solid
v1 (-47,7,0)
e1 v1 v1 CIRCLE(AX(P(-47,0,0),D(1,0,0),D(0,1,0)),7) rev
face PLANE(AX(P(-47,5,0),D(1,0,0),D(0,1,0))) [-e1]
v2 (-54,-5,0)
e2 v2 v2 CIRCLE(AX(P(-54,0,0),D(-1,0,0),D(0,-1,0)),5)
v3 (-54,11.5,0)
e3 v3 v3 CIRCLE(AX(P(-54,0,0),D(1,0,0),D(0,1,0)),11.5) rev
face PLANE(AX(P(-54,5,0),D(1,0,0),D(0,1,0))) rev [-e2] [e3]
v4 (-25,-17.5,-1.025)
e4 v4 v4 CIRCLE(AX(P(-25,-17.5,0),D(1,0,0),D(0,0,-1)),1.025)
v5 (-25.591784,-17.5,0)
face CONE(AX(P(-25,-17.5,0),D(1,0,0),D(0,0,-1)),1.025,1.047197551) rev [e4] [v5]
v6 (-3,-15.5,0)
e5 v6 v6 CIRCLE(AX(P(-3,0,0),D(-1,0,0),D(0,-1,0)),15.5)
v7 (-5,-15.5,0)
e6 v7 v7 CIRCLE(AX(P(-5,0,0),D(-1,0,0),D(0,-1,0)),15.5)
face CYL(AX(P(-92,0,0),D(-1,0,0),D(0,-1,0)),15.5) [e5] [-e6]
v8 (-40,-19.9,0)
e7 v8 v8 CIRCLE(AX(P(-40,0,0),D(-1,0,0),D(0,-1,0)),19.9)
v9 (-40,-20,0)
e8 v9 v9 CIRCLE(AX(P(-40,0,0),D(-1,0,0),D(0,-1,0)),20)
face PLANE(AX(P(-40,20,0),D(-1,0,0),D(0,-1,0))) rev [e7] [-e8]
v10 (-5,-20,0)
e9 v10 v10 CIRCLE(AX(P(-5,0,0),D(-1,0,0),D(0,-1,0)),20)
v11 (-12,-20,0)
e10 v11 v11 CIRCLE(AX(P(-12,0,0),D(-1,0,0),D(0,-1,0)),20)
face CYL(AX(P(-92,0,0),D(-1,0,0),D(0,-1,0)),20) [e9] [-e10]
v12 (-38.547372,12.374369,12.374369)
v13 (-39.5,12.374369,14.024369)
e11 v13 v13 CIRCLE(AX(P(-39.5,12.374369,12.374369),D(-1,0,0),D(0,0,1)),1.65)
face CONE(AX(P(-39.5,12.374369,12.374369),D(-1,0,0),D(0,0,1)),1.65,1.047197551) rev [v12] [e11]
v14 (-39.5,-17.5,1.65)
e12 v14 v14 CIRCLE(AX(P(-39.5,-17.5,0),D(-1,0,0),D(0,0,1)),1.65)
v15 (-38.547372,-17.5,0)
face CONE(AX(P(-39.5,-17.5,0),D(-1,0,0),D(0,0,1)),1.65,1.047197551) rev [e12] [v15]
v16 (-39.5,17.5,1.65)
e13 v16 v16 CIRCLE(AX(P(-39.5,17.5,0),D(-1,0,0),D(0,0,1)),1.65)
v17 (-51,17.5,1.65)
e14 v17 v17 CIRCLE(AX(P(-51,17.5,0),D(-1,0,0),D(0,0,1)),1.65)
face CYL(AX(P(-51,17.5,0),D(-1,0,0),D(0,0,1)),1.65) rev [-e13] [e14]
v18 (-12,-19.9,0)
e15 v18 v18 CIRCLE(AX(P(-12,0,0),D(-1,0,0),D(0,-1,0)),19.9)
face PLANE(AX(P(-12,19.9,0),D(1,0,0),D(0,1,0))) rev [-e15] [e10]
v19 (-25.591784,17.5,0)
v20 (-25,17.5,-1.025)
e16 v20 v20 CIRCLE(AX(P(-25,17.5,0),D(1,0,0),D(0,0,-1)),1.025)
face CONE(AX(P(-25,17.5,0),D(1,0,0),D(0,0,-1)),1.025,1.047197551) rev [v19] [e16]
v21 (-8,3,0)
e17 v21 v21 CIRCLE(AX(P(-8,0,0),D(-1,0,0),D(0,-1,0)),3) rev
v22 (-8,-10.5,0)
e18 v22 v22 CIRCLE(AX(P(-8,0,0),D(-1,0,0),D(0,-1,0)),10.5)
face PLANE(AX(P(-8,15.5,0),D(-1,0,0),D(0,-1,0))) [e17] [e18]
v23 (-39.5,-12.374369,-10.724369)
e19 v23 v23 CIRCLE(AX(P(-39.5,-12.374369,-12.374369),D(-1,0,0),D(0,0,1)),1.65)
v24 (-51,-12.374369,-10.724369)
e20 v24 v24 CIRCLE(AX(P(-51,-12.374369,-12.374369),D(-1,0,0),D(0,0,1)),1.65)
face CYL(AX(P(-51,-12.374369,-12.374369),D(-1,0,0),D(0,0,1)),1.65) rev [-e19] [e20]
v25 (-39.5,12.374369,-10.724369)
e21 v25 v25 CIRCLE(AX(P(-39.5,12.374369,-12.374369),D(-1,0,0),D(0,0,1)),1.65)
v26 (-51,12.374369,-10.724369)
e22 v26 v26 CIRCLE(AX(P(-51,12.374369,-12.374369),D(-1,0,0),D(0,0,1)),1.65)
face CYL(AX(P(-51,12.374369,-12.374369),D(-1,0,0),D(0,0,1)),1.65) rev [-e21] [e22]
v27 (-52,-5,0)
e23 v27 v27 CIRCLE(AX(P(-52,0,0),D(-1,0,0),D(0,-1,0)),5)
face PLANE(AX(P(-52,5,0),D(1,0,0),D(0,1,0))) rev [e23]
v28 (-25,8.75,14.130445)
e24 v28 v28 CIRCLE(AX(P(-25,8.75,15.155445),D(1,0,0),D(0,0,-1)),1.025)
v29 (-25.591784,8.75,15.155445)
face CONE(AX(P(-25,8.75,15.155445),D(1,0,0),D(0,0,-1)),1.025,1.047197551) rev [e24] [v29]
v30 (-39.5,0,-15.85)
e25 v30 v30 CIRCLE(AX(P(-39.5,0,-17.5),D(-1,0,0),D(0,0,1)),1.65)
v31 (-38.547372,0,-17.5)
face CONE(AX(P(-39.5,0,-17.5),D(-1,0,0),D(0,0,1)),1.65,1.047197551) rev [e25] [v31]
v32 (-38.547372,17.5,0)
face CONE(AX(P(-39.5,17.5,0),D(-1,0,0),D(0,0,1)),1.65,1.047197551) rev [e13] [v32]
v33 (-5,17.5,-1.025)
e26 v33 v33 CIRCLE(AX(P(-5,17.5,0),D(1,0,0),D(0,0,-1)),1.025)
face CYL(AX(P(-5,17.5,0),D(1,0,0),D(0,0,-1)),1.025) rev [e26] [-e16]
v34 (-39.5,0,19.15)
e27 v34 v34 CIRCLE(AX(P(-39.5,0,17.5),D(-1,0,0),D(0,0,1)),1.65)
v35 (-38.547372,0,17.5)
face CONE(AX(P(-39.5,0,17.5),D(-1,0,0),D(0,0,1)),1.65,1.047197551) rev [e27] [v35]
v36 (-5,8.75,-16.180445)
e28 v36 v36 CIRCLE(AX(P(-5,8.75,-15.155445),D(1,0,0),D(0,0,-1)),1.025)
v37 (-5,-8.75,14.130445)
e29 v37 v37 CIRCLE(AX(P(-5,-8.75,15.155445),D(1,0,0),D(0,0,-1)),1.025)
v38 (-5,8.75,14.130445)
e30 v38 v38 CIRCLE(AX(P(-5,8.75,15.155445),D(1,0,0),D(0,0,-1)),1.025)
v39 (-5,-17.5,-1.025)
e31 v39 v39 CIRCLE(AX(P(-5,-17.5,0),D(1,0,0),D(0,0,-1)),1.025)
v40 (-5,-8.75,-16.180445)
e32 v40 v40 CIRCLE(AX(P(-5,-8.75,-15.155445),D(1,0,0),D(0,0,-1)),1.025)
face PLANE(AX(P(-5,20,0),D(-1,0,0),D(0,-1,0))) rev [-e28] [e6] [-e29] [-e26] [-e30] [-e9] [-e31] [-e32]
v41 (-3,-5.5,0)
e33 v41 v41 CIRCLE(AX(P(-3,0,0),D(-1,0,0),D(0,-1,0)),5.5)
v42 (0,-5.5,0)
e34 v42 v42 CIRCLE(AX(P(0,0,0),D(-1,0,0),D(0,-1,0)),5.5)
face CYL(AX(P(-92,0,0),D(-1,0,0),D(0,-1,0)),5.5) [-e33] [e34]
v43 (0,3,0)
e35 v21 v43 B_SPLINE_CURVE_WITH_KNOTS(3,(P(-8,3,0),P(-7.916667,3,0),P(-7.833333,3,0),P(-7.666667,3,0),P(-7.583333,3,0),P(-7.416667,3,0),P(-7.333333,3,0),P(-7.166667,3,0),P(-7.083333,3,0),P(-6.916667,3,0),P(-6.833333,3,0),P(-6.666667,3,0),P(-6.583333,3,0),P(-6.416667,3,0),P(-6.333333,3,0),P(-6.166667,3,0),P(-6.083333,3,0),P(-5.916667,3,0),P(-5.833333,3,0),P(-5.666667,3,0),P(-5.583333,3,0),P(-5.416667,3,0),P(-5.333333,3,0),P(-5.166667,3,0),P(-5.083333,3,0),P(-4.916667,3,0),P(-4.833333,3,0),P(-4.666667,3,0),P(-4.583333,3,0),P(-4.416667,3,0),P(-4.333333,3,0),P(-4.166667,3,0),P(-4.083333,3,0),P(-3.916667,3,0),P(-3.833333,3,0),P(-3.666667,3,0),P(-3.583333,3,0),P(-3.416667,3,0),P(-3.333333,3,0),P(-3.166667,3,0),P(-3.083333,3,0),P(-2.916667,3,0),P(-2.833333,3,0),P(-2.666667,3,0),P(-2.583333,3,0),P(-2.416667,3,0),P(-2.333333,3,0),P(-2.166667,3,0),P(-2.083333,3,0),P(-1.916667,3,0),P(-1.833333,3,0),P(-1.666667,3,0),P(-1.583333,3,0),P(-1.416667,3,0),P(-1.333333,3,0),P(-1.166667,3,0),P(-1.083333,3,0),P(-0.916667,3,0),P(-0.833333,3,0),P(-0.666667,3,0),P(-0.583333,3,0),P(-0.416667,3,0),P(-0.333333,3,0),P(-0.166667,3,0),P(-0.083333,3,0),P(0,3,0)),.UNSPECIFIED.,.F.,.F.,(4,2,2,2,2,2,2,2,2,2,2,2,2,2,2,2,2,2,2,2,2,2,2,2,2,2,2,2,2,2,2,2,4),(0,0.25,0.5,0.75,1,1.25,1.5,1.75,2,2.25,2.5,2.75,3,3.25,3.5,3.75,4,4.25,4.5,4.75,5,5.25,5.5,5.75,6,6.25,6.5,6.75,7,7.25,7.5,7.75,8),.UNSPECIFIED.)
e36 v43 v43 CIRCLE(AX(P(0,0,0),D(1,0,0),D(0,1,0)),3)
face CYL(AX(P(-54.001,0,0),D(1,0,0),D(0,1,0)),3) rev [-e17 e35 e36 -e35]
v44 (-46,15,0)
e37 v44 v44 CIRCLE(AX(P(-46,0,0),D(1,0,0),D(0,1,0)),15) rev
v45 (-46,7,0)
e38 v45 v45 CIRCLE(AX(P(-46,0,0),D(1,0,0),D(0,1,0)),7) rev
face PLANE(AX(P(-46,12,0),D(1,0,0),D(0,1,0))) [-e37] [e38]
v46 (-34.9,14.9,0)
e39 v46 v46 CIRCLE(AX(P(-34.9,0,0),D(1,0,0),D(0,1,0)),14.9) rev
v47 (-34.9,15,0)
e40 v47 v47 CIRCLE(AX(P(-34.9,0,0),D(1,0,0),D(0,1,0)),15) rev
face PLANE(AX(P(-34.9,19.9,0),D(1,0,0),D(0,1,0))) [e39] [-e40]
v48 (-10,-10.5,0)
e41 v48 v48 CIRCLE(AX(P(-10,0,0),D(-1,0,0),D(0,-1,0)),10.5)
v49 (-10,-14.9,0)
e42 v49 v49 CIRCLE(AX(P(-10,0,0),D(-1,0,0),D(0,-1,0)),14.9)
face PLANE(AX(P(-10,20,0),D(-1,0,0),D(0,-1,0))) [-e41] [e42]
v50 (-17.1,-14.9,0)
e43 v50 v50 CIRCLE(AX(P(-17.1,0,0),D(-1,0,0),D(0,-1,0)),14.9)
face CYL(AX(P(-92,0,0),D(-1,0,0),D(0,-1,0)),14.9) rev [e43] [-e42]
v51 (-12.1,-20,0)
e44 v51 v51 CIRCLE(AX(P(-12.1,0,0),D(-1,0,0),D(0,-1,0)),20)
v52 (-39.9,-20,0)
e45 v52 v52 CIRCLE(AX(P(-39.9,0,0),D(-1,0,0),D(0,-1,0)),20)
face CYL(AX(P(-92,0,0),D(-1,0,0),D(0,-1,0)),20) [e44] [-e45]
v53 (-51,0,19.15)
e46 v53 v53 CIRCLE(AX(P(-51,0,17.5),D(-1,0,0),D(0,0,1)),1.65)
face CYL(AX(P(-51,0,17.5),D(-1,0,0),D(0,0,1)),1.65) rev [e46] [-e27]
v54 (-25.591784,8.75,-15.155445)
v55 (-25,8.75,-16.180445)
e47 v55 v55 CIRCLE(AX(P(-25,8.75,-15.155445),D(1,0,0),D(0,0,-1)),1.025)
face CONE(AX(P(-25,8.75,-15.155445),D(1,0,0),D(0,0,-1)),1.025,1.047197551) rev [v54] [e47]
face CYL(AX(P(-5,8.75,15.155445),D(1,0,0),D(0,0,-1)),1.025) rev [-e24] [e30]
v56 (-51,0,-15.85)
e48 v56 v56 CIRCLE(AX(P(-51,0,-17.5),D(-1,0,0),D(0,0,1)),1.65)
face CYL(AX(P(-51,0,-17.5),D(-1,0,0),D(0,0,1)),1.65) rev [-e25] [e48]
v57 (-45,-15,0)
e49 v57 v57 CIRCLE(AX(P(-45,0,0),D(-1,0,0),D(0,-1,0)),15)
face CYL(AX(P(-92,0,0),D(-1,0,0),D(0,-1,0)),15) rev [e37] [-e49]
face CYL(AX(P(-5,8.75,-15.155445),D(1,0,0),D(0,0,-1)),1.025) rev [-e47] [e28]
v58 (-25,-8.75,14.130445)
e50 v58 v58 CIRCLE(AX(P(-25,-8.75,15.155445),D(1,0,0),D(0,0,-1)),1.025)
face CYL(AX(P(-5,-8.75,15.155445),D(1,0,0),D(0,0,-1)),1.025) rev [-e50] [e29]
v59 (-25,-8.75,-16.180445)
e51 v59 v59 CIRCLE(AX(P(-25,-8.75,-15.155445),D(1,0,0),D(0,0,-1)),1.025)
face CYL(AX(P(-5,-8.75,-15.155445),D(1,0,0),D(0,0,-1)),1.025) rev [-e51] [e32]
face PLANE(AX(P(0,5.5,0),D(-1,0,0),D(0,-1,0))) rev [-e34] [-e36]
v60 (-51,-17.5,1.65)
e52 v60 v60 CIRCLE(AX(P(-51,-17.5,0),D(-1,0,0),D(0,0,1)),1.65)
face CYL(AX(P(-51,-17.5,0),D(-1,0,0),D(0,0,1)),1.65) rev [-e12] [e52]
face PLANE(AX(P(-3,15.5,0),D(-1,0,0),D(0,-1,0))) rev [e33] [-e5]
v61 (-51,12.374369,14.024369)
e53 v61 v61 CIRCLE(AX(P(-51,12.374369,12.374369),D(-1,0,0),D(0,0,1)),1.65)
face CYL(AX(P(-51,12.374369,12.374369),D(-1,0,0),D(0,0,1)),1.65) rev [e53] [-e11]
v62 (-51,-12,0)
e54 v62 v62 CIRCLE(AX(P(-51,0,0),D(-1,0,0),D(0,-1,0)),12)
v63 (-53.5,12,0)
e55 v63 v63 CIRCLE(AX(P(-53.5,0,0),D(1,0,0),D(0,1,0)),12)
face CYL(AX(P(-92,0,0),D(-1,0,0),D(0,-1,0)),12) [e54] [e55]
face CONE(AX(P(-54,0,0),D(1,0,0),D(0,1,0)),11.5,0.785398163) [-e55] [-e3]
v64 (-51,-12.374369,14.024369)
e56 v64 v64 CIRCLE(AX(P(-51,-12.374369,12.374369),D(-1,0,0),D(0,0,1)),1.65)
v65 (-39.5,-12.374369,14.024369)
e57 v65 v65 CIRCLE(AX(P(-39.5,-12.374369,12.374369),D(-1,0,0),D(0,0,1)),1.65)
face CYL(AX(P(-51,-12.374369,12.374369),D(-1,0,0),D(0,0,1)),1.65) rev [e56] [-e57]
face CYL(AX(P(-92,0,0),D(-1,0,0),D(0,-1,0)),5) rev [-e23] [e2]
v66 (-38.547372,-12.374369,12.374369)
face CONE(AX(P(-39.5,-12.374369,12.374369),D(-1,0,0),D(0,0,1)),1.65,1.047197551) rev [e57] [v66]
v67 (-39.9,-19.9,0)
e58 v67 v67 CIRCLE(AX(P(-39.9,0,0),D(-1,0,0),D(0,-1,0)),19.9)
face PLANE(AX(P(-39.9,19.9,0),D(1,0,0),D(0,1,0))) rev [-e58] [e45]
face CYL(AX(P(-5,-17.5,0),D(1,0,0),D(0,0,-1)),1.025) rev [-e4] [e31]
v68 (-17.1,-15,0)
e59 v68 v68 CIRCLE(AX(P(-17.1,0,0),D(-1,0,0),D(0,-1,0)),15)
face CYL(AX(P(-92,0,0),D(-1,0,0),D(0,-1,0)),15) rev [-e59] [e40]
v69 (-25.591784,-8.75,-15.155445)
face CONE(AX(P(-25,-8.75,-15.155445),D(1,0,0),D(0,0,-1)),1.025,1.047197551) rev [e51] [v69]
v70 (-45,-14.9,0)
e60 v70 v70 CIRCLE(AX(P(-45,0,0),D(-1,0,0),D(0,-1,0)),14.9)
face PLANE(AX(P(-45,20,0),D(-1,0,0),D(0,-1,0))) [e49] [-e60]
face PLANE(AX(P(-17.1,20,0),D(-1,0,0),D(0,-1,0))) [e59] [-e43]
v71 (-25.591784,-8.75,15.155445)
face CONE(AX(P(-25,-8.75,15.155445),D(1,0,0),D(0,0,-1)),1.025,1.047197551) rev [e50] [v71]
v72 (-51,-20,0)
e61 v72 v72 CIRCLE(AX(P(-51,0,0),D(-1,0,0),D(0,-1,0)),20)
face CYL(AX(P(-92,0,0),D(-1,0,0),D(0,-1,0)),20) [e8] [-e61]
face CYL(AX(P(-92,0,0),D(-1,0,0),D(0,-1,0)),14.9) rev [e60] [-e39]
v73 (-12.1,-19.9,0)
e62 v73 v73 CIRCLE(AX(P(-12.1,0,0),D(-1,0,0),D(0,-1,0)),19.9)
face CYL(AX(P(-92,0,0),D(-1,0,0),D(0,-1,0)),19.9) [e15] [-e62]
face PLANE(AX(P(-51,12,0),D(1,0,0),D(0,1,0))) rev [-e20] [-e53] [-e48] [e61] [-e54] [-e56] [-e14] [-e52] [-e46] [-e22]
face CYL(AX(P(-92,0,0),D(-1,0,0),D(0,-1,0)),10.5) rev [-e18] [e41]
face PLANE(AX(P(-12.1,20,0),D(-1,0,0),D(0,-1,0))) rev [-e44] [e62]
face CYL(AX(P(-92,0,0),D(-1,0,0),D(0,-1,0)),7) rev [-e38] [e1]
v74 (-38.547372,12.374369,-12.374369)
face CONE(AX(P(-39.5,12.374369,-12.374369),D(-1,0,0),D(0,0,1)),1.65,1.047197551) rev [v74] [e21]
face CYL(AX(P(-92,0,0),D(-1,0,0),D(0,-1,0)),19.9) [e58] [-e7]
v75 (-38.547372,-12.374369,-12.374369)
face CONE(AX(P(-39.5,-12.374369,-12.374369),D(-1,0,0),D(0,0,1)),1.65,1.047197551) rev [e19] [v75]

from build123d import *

# Parameters (mm, degrees)
COQUE1_START                 = -46
COQUE1_OUTLINE_R             = 14.9
COQUE1_DEPTH                 = 36
COQUE1_START_2               = -10
COQUE1_2_OUTLINE_R           = 10.5
COQUE1_2_DEPTH               = 2
COQUE1_START_3               = -34.9
COQUE1_3_OUTLINE_R           = 15
COQUE1_3_OUTLINE_R_2         = 14.9
COQUE1_3_DEPTH               = 17.8
COQUE1_START_4               = -47
COQUE1_4_OUTLINE_R           = 7
COQUE1_4_DEPTH               = 1
COQUE1_5_OUTLINE_R           = 15
COQUE1_5_OUTLINE_R_2         = 14.9
COQUE1_5_DEPTH               = 1
COQUE1_START_5               = -8
COQUE1_6_OUTLINE_R           = 0.5
COQUE1_6_DEPTH               = 3
CHANFREIN1_SIZE              = 0.5
ENL_V_MAT_EXTRU_1_REACH      = 62.959
ESQUISSE5_R                  = 3
R_P_TITION_CIRCULAIRE1_COUNT = 8
R_P_TITION_CIRCULAIRE2_COUNT = 6


# Read off the part's stored shape, not the designer's step: Coque1
with BuildPart() as part:
    # Esquisse1 → Base-Révolution (revolve)
    with BuildSketch(Plane.XY, mode=Mode.PRIVATE) as base_r_volution_sk:
        Polygon((-54, 5), (-54, 12), (-51, 12), (-51, 20), (-40, 20), (-40, 19.9), (-39.9, 19.9), (-39.9, 20), (-12.1, 20), (-12.1, 19.9), (-12, 19.9), (-12, 20), (-5, 20), (-5, 15.5), (-3, 15.5), (-3, 5.5), (0, 5.5), (0, 0), (-52, 0), (-52, 5), align=None)
    revolve(base_r_volution_sk.sketch.rotate(Axis((-92, 0, 0), (1, 0, 0)), 180), axis=Axis((-92, 0, 0), (1, 0, 0)))

    # Coque1 outline → Coque1 (cut)
    with BuildSketch(Plane.YZ.offset(COQUE1_START)):
        Circle(COQUE1_OUTLINE_R)
    extrude(amount=COQUE1_DEPTH, mode=Mode.SUBTRACT)

    # Coque1 2 outline → Coque1 2 (cut)
    with BuildSketch(Plane.YZ.offset(COQUE1_START_2)):
        Circle(COQUE1_2_OUTLINE_R)
    extrude(amount=COQUE1_2_DEPTH, mode=Mode.SUBTRACT)

    # Coque1 3 outline → Coque1 3 (cut)
    with BuildSketch(Plane.YZ.offset(COQUE1_START_3)):
        Circle(COQUE1_3_OUTLINE_R)
        Circle(COQUE1_3_OUTLINE_R_2, mode=Mode.SUBTRACT)
    extrude(amount=COQUE1_3_DEPTH, mode=Mode.SUBTRACT)

    # Coque1 4 outline → Coque1 4 (cut)
    with BuildSketch(Plane.YZ.offset(COQUE1_START_4)):
        Circle(COQUE1_4_OUTLINE_R)
    extrude(amount=COQUE1_4_DEPTH, mode=Mode.SUBTRACT)

    # Coque1 5 outline → Coque1 5 (cut)
    with BuildSketch(Plane.YZ.offset(COQUE1_START)):
        Circle(COQUE1_5_OUTLINE_R)
        Circle(COQUE1_5_OUTLINE_R_2, mode=Mode.SUBTRACT)
    extrude(amount=COQUE1_5_DEPTH, mode=Mode.SUBTRACT)

    # Coque1 6 outline → Coque1 6 (cut)
    with BuildSketch(Plane.YZ.offset(COQUE1_START_5)):
        Circle(COQUE1_6_OUTLINE_R)
    extrude(amount=COQUE1_6_DEPTH, mode=Mode.SUBTRACT)

    # Chanfrein1
    chanfrein1_edges = [part.edges().sort_by_distance(p)[0] for p in [
        (-54, 12, 0),
    ]]
    chamfer(chanfrein1_edges, length=CHANFREIN1_SIZE)

    # Esquisse5 → Enlèv. mat.-Extru.1 (cut, up to next)
    with BuildSketch(Plane(origin=(0, 0, 0), x_dir=(0, 0, -1), z_dir=(1, 0, 0)), mode=Mode.PRIVATE) as enl_v_mat_extru_1_sk1:
        with Locations(Location((0, 0, 0), (0, 0, 90))):
            Circle(ESQUISSE5_R)
    enl_v_mat_extru_1_tool1 = extrude(enl_v_mat_extru_1_sk1.sketch, amount=-ENL_V_MAT_EXTRU_1_REACH, mode=Mode.PRIVATE) & part.part
    add(enl_v_mat_extru_1_tool1.solids().sort_by_distance((0, 0, 0))[0], mode=Mode.SUBTRACT)

    # Esquisse4 → Trou taraudé M41 (revolve, cut)
    with BuildSketch(Plane(origin=(-51, 17.5, 0), x_dir=(0, 0, 1), z_dir=(0, 1, 0))):
        Polygon((0, 0), (0, 12.452627944), (1.65, 11.5), (1.65, 0), align=None)
    trou_taraud_m41 = revolve(axis=Axis((-57.35, 17.5, 0), (1, 0, 0)), mode=Mode.SUBTRACT)

    # Esquisse6 → Trou taraudé M2.51 (revolve, cut)
    with BuildSketch(Plane(origin=(-5, 17.5, 0), x_dir=(0, 0, -1), z_dir=(0, 1, 0))):
        Polygon((0, 0), (0, 20.591784026), (1.025, 20), (1.025, 0), align=None)
    trou_taraud_m2_51 = revolve(axis=Axis((1.35, 17.5, 0), (-1, 0, 0)), mode=Mode.SUBTRACT)

    # Répétition circulaire1: Trou taraudé M41 ×8 about axis
    r_p_tition_circulaire1_axis = Axis((0, 0, 0), (1, 0, 0))
    for i in range(1, R_P_TITION_CIRCULAIRE1_COUNT):
        add(trou_taraud_m41.rotate(r_p_tition_circulaire1_axis, i * 360 / R_P_TITION_CIRCULAIRE1_COUNT), mode=Mode.SUBTRACT)

    # Répétition circulaire2: Trou taraudé M2.51 ×6 about axis
    r_p_tition_circulaire2_axis = Axis((0, 0, 0), (1, 0, 0))
    for i in range(1, R_P_TITION_CIRCULAIRE2_COUNT):
        add(trou_taraud_m2_51.rotate(r_p_tition_circulaire2_axis, i * 360 / R_P_TITION_CIRCULAIRE2_COUNT), mode=Mode.SUBTRACT)


solid = part.part
